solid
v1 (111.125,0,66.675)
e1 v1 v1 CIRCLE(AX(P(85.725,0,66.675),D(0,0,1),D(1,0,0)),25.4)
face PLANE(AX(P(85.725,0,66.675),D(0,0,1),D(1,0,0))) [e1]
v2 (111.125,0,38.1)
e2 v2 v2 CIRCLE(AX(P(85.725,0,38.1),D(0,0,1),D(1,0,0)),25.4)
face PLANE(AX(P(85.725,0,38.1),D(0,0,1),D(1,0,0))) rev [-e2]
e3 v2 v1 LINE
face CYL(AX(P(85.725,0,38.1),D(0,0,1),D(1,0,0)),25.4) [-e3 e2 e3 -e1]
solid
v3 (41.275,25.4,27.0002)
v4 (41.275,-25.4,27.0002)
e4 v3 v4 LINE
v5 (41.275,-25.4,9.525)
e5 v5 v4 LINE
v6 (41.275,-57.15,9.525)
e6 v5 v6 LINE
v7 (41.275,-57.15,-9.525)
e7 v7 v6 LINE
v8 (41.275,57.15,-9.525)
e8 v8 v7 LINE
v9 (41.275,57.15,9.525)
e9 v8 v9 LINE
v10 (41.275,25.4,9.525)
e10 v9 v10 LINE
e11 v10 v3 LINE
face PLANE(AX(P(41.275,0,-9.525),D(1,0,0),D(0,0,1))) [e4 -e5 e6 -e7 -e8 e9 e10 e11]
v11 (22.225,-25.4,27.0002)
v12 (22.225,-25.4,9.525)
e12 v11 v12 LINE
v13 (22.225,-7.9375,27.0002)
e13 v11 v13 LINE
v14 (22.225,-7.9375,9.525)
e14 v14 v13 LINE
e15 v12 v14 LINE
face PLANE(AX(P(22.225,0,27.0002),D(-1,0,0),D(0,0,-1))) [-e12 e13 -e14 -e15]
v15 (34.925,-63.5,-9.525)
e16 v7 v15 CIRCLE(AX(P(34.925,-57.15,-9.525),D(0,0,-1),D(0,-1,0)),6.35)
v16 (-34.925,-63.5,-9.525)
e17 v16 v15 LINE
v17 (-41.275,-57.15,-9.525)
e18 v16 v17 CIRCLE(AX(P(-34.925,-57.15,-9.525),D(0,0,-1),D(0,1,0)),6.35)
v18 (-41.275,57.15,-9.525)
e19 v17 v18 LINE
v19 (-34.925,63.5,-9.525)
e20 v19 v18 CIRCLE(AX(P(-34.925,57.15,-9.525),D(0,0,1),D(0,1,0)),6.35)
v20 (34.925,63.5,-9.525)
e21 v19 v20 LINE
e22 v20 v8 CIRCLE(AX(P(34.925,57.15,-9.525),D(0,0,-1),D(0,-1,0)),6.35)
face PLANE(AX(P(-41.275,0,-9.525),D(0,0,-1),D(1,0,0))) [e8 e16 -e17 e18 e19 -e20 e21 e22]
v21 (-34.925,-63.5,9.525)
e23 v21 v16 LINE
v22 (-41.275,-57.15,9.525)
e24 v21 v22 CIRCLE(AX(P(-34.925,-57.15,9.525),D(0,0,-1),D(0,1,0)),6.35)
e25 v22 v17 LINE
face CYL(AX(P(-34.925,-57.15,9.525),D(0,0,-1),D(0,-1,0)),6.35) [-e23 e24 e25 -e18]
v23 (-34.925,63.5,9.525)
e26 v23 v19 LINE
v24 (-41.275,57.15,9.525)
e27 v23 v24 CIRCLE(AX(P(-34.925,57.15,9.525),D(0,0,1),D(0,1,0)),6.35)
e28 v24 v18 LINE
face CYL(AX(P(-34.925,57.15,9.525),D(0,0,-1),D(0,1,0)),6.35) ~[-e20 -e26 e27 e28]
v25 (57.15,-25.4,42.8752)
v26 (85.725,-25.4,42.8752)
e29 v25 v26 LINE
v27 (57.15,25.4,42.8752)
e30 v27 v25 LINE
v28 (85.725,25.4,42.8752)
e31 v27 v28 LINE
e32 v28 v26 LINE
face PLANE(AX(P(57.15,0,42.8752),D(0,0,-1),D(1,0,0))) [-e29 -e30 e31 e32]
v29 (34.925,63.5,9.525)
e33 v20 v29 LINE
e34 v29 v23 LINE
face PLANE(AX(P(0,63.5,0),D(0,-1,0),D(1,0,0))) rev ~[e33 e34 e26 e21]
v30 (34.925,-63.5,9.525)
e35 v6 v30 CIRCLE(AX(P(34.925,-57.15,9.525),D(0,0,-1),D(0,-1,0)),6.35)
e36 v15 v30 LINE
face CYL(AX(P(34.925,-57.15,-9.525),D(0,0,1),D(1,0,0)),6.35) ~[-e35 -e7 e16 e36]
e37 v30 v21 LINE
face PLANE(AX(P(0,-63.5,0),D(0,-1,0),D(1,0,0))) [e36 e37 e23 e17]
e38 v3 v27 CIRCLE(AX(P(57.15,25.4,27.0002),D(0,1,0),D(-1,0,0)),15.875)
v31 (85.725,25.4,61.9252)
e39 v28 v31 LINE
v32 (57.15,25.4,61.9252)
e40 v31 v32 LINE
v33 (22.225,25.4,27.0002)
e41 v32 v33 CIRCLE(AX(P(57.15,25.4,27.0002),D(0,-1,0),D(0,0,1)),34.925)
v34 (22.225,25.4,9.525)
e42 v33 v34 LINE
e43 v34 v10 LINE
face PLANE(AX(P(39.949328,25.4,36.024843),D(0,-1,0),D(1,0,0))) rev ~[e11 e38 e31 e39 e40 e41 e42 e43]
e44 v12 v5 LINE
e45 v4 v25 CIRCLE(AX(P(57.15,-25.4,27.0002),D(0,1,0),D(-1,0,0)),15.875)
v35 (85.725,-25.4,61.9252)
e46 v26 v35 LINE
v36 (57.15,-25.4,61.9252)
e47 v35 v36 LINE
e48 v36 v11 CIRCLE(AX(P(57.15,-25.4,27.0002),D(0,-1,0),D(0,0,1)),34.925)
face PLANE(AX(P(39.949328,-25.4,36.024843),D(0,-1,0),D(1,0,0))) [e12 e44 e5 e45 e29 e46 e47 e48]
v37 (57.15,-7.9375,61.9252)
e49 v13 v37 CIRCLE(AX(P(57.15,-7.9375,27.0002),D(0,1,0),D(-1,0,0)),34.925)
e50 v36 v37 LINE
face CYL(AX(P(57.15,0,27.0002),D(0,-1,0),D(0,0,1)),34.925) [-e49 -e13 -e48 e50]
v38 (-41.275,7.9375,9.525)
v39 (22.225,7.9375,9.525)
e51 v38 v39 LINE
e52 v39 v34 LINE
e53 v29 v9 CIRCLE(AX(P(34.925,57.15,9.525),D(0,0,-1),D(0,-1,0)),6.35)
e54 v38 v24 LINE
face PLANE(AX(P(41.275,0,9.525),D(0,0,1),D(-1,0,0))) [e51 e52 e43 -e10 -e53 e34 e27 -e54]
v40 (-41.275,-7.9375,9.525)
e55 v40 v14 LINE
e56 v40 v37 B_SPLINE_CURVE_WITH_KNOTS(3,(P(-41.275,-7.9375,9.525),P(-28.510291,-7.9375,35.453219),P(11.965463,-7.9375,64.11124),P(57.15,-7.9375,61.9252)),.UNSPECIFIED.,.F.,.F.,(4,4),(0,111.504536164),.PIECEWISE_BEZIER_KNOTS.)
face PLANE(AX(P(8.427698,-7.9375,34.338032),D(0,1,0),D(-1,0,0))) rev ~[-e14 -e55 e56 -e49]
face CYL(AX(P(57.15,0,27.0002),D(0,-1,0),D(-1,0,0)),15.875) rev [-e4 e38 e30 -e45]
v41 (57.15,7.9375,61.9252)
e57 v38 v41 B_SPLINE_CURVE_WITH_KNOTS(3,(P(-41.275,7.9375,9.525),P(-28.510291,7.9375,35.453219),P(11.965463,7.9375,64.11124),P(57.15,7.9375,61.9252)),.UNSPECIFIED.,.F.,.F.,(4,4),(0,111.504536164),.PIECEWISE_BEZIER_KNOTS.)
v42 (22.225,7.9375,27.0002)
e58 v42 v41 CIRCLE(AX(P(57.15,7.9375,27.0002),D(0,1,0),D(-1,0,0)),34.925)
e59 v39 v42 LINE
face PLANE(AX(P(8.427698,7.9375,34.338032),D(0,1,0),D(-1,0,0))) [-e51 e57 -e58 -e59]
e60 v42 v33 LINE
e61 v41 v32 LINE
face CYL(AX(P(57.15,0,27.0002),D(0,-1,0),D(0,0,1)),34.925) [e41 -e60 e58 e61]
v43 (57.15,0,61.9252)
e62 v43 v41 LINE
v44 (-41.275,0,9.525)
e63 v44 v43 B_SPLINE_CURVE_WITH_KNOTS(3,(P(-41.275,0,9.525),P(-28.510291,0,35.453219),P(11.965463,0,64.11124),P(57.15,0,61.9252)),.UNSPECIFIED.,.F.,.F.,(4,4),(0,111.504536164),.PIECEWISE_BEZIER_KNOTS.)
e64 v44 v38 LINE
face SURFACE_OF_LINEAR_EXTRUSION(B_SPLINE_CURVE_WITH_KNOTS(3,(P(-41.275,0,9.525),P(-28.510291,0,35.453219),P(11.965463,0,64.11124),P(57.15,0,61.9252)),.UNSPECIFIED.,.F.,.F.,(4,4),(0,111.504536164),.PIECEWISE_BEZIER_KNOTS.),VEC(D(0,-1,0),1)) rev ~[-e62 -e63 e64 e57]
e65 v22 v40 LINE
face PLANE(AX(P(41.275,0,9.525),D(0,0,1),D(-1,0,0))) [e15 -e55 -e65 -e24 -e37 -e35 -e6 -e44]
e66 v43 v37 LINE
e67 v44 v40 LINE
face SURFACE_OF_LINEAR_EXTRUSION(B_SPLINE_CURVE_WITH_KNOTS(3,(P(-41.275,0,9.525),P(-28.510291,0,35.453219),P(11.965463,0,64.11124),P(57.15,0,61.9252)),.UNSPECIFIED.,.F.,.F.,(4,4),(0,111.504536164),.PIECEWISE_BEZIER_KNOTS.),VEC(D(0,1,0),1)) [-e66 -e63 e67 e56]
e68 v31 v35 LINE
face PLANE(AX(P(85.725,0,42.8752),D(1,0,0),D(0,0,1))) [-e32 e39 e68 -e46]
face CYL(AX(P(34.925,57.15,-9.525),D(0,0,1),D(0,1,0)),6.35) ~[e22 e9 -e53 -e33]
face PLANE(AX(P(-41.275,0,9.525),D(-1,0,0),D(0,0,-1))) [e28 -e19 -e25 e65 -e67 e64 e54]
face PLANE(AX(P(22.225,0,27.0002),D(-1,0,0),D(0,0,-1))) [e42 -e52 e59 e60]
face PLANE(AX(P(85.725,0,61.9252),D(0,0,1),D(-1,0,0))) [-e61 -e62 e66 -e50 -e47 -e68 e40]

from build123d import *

# Parameters (mm, degrees)
F1_DEPTH = 63.5
F0_W     = 25.4
F0_H     = 19.05
F2_DEPTH = 25.4
F3_DEPTH = 7.9375
F5_R     = 6.35


# Not quite as in the source:
# - ends of sketch curves that miss each other by under 0.0002 mm in the source are joined


with BuildPart() as f1:
    # F0 (on Front) → F1 (new body, symmetric)
    with BuildSketch(Plane.XZ):
        Polygon((-41.275, -9.525), (41.275, -9.525), (41.275, 9.525), (22.225, 9.525), (-41.275, 9.525), align=None)
    extrude(amount=F1_DEPTH, both=True)

    # F0 (on Front) → F2 (join, symmetric)
    with BuildSketch(Plane.XZ):
        with BuildLine():
            Line((22.225, 9.525), (41.275, 9.525))
            Line((41.275, 9.525), (41.275, 27.0002))
            ThreePointArc((41.275, 27.0002), (45.9246798487, 38.2255201513), (57.15, 42.8752))
            Line((57.15, 42.8752), (60.325, 42.8752))
            Line((60.325, 42.8752), (60.325, 61.9252))
            Line((60.325, 61.9252), (57.15, 61.9252))
            ThreePointArc((57.15, 61.9252), (32.4542956671, 51.6959043329), (22.225, 27.0002))
            Line((22.225, 27.0002), (22.225, 9.525))
        make_face()
        with Locations((73.025, 52.4002)):
            Rectangle(F0_W, F0_H)
    extrude(amount=F2_DEPTH, both=True)

    # F0 (on Front) → F3 (join, symmetric)
    with BuildSketch(Plane.XZ):
        with BuildLine():
            add(Edge.make_bspline(
                [(-41.275, 9.525), (-28.5102911294, 35.4532189667), (11.965462938, 64.1112402081), (57.15, 61.9252)],
                knots=[0, 0, 0, 0, 111.5045361635, 111.5045361635, 111.5045361635, 111.5045361635], degree=3))
            Line((-41.275, 9.525), (22.225, 9.525))
            Line((22.225, 9.525), (22.225, 27.0002))
            ThreePointArc((22.225, 27.0002), (32.4542956671, 51.6959043329), (57.15, 61.9252))
        make_face()
    extrude(amount=F3_DEPTH, both=True)

    # F5
    f5_edges = [f1.edges().sort_by_distance(p)[0] for p in [
        (41.275, -63.5, 0),
        (-41.275, -63.5, 0),
        (41.275, 63.5, 0),
        (-41.275, 63.5, 0),
    ]]
    fillet(f5_edges, radius=F5_R)


with BuildPart() as f4:
    # F0 (on Front) → F4 (revolve)
    with BuildSketch(Plane.XZ):
        Polygon((85.725, 66.675), (85.725, 61.9252), (85.725, 42.8752), (85.725, 38.1), (111.125, 38.1), (111.125, 66.675), align=None)
    revolve(axis=Axis((85.725, 0, 52.3875), (0, 0, 1)))


solid = Compound([f1.part, f4.part])
